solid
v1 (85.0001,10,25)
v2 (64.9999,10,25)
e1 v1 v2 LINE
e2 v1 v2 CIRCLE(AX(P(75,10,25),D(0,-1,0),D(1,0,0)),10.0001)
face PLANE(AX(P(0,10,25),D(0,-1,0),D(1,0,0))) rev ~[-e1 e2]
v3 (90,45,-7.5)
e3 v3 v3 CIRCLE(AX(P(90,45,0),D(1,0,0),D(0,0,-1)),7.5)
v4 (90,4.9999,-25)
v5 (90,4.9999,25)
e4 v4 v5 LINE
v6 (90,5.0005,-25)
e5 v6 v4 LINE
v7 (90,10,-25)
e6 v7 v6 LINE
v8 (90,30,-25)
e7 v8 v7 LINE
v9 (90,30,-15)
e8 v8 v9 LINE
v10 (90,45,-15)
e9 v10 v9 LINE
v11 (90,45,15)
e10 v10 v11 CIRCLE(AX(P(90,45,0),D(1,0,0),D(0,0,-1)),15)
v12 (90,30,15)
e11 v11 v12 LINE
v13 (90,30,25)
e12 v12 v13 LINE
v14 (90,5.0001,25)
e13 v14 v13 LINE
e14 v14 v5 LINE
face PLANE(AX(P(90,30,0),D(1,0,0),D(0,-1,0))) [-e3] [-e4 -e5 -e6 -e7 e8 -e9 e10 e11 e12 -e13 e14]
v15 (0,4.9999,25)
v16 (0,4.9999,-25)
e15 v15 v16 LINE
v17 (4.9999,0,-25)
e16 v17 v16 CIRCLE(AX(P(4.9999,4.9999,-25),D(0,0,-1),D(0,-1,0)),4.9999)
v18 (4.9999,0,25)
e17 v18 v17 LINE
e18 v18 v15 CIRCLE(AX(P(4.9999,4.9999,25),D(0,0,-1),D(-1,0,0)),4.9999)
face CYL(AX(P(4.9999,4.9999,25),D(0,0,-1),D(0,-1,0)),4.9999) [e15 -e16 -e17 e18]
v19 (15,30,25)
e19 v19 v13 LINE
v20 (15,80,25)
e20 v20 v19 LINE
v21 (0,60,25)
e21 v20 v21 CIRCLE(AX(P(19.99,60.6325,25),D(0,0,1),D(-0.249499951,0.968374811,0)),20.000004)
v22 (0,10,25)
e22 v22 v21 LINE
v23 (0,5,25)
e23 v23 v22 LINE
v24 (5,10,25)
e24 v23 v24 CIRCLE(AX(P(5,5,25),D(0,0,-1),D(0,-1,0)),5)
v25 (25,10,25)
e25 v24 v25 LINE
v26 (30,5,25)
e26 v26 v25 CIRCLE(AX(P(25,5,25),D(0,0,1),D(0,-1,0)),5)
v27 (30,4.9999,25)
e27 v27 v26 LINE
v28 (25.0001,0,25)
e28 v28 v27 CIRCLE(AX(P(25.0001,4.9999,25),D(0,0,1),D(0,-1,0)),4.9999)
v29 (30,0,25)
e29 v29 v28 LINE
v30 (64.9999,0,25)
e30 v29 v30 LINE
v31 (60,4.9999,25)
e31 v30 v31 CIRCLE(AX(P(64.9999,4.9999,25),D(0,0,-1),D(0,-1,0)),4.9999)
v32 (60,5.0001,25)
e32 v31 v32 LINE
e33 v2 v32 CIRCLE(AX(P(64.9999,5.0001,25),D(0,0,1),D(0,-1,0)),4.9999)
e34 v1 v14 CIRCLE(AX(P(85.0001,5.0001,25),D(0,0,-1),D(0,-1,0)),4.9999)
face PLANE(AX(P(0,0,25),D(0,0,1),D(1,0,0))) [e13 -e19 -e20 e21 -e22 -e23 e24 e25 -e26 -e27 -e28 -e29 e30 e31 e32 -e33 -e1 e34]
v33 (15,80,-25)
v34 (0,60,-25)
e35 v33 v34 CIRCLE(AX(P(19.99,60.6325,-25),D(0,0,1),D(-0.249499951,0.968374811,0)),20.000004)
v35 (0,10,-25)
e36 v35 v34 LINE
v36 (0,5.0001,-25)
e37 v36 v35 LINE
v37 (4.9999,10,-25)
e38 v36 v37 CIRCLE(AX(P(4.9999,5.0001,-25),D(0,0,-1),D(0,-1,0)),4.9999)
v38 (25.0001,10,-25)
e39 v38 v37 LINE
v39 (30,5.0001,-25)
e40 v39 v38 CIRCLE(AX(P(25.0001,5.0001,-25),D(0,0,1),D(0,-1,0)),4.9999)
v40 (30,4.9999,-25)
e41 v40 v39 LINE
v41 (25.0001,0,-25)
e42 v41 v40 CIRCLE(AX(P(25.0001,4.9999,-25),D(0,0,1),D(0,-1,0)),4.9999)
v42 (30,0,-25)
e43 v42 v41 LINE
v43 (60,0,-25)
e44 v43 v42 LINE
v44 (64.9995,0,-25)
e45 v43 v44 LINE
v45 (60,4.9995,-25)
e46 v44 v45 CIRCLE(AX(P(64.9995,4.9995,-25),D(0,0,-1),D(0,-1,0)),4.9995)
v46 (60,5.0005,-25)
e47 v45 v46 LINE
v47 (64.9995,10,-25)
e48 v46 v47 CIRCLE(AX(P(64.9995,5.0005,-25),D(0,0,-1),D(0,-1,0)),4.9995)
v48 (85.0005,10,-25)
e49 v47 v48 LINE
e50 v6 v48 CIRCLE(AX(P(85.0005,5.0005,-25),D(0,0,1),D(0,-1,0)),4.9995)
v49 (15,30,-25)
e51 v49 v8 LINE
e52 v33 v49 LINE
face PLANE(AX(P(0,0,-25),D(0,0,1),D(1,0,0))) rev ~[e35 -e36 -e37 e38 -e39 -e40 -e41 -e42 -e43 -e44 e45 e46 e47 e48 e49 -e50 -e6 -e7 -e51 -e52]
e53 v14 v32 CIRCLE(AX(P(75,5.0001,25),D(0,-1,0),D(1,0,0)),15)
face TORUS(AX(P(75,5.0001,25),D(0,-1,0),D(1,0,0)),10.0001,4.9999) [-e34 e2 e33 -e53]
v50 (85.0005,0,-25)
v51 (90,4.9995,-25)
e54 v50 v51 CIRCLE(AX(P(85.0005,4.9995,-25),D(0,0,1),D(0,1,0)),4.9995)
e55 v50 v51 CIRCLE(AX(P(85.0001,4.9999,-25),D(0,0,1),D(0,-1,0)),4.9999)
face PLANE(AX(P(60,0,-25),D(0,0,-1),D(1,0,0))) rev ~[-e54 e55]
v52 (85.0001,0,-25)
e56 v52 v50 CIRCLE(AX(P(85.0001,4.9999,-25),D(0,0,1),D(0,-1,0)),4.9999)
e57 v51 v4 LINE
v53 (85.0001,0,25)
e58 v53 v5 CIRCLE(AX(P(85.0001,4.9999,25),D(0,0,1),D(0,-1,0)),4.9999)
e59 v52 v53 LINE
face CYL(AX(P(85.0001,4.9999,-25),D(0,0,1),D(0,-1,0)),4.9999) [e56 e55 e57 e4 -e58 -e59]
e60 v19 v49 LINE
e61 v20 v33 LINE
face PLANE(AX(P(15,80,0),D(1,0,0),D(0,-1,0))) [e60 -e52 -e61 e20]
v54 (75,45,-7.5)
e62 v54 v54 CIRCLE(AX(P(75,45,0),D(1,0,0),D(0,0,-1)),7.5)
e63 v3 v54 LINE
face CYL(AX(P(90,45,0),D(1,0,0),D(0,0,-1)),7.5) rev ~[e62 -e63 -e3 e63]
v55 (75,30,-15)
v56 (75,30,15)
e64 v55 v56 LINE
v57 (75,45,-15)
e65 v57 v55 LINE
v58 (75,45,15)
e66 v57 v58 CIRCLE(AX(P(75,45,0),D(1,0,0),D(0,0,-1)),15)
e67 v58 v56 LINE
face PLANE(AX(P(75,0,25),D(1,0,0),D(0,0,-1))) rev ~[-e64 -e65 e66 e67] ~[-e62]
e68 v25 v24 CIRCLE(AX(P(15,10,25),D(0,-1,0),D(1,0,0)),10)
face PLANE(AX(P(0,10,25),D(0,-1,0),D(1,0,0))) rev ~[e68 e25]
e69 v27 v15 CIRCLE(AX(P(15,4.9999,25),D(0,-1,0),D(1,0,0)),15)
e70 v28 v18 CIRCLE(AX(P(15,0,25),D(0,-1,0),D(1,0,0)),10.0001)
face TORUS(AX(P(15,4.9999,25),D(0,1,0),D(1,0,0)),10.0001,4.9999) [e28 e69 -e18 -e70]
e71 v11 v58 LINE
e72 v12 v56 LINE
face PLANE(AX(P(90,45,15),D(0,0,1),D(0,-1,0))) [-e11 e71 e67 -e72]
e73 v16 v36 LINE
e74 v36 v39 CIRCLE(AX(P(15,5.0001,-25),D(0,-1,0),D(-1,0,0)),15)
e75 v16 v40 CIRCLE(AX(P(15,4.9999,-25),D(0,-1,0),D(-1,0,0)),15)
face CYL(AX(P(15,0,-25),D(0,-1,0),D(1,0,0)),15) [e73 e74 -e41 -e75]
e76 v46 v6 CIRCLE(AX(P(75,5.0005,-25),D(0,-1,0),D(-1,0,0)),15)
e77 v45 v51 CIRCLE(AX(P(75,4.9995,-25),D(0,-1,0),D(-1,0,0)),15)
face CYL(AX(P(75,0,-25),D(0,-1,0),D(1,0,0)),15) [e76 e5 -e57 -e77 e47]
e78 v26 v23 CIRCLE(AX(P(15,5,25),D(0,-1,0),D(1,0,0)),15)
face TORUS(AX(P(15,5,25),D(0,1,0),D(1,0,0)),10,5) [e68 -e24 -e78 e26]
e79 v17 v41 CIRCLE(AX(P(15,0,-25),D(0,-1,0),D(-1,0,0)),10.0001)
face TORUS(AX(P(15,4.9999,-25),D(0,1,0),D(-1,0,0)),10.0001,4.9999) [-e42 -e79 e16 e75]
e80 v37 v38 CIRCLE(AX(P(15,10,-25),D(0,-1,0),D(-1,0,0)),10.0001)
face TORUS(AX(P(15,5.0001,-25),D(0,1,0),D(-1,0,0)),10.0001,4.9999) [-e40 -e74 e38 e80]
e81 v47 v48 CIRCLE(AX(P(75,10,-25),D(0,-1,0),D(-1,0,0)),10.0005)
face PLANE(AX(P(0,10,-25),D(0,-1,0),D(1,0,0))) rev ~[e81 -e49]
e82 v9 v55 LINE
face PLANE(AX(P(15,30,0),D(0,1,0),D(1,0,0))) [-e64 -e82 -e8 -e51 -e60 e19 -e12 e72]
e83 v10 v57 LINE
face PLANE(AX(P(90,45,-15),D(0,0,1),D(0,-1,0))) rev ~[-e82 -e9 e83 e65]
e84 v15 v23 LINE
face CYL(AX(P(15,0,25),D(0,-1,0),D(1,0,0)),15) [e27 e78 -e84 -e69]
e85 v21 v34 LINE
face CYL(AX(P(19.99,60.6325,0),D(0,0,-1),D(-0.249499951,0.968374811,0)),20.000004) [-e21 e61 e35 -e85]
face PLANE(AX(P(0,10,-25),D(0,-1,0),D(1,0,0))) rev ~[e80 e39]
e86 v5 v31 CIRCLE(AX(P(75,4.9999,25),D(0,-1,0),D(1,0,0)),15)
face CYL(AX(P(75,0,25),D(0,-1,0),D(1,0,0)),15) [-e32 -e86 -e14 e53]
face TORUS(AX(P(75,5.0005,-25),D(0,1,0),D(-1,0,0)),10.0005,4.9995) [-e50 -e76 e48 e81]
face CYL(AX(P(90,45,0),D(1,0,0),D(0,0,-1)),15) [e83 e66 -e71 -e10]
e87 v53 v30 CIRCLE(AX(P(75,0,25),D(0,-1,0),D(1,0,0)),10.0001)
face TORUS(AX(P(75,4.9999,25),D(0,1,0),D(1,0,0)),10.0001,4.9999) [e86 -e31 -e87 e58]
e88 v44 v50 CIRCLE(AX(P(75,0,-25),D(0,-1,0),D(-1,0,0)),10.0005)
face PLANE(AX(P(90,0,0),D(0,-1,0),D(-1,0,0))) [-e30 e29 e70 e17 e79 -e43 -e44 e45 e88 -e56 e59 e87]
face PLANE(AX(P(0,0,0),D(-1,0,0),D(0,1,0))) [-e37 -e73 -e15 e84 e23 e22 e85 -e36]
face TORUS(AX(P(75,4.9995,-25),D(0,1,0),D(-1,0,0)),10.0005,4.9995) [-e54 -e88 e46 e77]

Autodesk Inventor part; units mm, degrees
ref_plane "YZ Plane" through (0, 0, 0) normal (1, 0, 0) x (0, 1, 0)
ref_plane "XZ Plane" through (0, 0, 0) normal (0, 1, 0) x (-1, 0, 0)
ref_plane "XY Plane" through (0, 0, 0) normal (0, 0, 1) x (1, 0, 0)
sketch "Sketch1" plane through (0, 0, 0) normal (0, 0, 1) x (1, 0, 0)
  line L0 (0, 0) -> (0, 60)
  line L1 (15, 80) -> (15, 30)
  line L2 (15, 30) -> (90, 30)
  line L3 (90, 30) -> (90, 0)
  line L4 (90, 0) -> (0, 0)
  arc A0 (15, 80) -> (0, 60) centre (19.99, 60.6325) ccw
  dimension "d0" = 60
  dimension "d1" = 90
  dimension "d2" = 30
  dimension "d3" = 75
  dimension "d4" = 50
  dimension "d5" = 20
extrude "Extrusion1" add sketch "Sketch1" along normal mid plane 50
sketch "Sketch2" plane through (90, 0, 25) normal (1, 0, 0) x (0, 0, -1)
  line L0 (50, 30) -> (0, 30) projected
  arc A0 (40, 45) -> (10, 45) centre (25, 45) ccw
  line L1 (50, 0) -> (0, 0) projected
  line L2 (50, 80) -> (50, 30) projected
  line L3 (10, 45) -> (10, 30)
  line L4 (40, 45) -> (40, 30)
  circle A1 centre (25, 45) radius 7.5
  point P0 (25, 0)
  dimension "d10" = 45
  dimension "d11" = 25
  dimension "d13" = 15
  dimension "d14" = 15
extrude "Extrusion2" add sketch "Sketch2" against normal blind 15
sketch "Sketch3" plane through (0, 0, 25) normal (0, 0, 1) x (1, 0, 0)
  point P0 (0, 0)
sketch "Sketch5" plane through (0, 0, 25) normal (0, -1, 0) x (1, 0, 0)
  line L0 (90, 0) -> (15, 0) projected
  line L1 (0, 0) -> (90, 0) projected
  circle A0 centre (15, 0) radius 15
  circle A1 centre (75, 0) radius 15
  point P0 (0, -25)
  point P1 (60, 0)
  point P2 (30, 0)
  dimension "d18" = 30
extrude "Extrusion3" add sketch "Sketch5" against normal blind 10 contours L0 L1 A0 | L0 A1 picked at (5.1453, 1.1966) picked at (70.6847, 5.6392)
full round fillet "Full Round Fillet2" first side at (70, 10, 31.6312) centre faces at (60.1942, 3.3333, 27.4062) second side at (50, 0, -8.3333)
sketch "Sketch7" plane through (0, 0, -25) normal (0, -1, 0) x (1, 0, 0)
  line L0 (15, 0) -> (90, 0) projected
  line L1 (90, 0) -> (0, 0) projected
  circle A0 centre (15, 0) radius 15
  circle A1 centre (75, 0) radius 15
  line L2 (0, 0) -> (0, 50) projected
  line L3 (90, 0) -> (90, 50) projected
  point P0 (0, 25)
  point P1 (30, 0)
  point P2 (60, 0)
  dimension "d21" = 30
  dimension "d22" = 30
extrude "Extrusion4" add sketch "Sketch7" against normal blind 10 contours L0 A0 L1 | L0 A1 picked at (24.8547, -1.1966) picked at (78.2678, -7.6351)
full round fillet "Full Round Fillet4" first side at (18.8878, 10, -29.5122) centre faces at (29.9514, 6.6667, -26.207) second side at (51.6666, 0, 8.3333)
fillet "Fillet1" radius 5 1 edges at (15, 10, 40)
fillet "Fillet2" radius 5 2 edges at (75, 10, -40) (75, 0, -40)
properties part number "Lab 1B A"
